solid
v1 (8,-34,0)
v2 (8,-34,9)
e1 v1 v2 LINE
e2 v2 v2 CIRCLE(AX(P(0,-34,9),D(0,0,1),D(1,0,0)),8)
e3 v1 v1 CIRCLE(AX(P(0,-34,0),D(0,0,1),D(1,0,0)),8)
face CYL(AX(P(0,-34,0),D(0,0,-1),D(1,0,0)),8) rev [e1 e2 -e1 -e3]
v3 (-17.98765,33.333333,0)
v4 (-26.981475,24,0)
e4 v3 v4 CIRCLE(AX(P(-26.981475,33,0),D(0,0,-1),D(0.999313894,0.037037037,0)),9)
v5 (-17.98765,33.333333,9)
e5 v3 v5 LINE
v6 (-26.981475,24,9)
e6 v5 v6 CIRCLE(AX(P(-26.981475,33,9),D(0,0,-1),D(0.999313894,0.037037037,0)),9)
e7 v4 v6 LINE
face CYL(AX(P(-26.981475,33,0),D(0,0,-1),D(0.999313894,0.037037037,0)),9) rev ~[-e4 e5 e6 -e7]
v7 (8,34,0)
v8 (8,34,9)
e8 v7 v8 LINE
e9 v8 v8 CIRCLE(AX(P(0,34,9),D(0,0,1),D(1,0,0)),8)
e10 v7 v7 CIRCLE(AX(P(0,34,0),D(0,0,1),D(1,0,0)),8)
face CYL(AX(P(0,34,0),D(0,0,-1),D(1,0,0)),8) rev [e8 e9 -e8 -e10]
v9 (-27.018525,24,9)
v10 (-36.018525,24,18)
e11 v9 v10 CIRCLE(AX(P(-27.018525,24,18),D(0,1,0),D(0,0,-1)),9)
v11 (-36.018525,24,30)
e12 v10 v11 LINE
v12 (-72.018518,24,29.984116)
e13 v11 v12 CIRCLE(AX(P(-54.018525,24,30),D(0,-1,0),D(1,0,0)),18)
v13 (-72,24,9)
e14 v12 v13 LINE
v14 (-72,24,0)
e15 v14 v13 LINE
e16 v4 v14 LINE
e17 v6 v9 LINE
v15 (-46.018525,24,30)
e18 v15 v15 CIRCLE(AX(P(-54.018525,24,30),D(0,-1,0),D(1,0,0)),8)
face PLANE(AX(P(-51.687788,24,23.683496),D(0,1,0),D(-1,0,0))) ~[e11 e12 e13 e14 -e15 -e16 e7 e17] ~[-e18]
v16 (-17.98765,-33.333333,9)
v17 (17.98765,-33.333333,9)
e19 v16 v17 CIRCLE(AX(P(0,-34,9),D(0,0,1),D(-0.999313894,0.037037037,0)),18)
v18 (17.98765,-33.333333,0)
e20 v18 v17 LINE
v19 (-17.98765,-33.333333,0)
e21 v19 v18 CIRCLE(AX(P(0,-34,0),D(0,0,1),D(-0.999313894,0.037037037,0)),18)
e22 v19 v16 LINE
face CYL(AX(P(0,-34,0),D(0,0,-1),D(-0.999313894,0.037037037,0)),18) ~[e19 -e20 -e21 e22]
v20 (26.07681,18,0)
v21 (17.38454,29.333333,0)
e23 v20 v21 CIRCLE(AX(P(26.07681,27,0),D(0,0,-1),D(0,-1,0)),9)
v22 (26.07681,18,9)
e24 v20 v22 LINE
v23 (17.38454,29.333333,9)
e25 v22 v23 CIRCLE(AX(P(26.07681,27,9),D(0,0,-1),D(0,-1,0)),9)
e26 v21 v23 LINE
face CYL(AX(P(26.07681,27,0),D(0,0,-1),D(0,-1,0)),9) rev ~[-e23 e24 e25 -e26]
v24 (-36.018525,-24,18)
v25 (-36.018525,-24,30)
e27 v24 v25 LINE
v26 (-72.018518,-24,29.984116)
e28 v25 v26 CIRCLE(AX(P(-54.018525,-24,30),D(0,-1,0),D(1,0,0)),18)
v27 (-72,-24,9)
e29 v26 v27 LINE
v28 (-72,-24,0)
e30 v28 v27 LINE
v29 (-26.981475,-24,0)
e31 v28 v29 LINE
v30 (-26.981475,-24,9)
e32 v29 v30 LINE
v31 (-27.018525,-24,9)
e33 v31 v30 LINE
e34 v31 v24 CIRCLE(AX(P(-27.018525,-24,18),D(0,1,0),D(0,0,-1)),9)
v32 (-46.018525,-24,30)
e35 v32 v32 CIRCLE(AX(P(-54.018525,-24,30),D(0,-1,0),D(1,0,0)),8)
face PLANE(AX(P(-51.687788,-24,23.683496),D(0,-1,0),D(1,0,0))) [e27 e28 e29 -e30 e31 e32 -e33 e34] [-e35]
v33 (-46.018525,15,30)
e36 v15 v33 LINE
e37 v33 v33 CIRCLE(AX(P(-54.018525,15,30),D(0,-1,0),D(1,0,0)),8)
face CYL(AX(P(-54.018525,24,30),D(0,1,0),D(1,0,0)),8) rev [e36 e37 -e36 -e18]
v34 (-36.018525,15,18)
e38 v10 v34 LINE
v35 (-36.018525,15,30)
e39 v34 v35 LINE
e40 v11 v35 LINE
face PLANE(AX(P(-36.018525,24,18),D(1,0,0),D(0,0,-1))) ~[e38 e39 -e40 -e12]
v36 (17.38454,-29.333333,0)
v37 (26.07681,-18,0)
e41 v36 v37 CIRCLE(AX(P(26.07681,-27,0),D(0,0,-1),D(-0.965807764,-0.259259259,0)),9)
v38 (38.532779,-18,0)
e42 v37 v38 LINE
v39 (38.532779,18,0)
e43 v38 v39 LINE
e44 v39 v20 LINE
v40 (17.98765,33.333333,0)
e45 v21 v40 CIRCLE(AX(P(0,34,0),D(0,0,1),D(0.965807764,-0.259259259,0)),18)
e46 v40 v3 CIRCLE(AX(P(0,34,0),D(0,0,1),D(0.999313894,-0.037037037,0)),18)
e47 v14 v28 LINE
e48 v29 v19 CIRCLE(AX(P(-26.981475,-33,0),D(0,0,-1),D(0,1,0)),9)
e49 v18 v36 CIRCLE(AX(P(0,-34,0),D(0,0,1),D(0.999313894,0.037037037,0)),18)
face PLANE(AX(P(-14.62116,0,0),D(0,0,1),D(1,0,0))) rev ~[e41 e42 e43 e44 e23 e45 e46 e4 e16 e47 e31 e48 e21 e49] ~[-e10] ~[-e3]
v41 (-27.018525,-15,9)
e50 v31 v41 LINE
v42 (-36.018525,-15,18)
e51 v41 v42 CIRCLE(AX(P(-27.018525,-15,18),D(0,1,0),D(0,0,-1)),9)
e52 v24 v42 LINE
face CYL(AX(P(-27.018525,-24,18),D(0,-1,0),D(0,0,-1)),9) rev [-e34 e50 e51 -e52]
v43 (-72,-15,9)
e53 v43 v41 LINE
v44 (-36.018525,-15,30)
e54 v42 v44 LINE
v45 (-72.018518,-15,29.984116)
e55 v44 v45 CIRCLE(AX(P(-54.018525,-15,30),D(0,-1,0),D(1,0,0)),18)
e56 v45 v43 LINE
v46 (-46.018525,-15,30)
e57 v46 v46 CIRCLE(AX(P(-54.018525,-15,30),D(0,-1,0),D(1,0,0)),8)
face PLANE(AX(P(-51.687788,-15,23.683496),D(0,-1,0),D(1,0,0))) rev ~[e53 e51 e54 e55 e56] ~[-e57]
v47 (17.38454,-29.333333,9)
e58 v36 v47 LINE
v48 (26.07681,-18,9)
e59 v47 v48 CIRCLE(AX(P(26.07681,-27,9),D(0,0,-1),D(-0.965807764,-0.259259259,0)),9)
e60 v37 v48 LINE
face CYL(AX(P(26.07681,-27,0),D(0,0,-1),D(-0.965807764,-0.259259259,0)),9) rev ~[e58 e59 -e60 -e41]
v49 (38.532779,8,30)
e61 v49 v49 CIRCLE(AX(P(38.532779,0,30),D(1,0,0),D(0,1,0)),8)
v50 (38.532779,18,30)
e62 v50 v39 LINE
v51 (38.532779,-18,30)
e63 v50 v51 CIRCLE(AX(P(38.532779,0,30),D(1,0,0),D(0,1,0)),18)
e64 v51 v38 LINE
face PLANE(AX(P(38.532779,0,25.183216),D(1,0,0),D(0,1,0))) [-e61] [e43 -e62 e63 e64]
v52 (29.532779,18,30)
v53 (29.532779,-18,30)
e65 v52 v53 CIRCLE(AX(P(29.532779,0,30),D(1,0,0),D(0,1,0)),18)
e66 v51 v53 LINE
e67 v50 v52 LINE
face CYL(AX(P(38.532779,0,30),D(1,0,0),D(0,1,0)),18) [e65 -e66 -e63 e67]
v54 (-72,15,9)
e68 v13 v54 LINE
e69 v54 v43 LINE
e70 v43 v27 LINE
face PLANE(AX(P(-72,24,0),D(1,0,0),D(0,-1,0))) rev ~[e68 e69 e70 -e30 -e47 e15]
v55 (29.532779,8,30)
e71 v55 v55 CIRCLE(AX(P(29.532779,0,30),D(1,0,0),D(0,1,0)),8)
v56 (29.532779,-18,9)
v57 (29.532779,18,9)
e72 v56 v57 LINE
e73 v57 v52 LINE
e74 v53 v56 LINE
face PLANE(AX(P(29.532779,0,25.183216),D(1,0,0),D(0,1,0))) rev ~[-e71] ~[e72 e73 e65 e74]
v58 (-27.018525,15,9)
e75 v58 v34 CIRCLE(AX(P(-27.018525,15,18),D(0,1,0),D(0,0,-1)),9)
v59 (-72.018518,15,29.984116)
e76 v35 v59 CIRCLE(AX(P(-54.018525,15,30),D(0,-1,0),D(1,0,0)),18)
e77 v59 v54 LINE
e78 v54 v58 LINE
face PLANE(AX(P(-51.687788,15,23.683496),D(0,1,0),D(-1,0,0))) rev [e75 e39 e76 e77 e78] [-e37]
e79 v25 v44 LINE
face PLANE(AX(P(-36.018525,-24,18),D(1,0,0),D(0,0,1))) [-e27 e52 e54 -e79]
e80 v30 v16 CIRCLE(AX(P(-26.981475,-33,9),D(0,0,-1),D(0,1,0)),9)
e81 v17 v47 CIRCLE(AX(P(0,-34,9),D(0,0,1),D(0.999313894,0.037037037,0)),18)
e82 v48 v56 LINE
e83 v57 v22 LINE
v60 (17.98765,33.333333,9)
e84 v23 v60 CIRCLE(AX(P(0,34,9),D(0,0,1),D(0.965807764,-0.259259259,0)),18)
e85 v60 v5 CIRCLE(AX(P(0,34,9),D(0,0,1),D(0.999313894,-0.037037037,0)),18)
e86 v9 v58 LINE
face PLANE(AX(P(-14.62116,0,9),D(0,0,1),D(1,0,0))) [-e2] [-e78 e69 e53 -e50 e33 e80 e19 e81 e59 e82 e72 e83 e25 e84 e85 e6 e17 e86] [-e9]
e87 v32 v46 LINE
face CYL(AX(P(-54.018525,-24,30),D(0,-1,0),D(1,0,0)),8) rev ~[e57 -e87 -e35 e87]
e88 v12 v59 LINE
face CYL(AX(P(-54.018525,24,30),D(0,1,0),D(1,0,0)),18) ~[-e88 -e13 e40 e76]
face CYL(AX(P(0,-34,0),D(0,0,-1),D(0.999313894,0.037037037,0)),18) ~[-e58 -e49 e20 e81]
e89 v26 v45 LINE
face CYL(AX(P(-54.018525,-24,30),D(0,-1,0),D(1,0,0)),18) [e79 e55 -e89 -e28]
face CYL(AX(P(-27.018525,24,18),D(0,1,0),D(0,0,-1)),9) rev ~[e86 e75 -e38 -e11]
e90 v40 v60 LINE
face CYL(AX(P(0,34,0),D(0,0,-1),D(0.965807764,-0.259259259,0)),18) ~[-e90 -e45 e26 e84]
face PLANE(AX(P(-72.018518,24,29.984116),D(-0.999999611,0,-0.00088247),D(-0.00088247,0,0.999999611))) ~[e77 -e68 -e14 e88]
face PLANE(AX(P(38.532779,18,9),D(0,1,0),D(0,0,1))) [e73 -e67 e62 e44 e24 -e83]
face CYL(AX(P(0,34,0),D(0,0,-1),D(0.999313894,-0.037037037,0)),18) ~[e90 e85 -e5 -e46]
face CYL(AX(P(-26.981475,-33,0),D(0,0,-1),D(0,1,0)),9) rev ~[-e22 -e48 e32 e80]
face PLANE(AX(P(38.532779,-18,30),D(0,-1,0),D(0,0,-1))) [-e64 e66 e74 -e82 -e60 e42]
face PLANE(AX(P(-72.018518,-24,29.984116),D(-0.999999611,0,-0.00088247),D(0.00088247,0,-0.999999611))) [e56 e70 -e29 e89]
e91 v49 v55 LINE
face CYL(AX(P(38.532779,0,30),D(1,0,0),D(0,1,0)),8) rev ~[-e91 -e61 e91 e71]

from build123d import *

# Parameters (mm, degrees)
F0_R     = 8
F1_DEPTH = 9
F3_DEPTH = 9
F4_R     = 8
F5_DEPTH = 9
F7_DEPTH = 9
F8_R     = 8
F9_DEPTH = 9


# Not quite as in the source:
# - a pattern or mirror of a feature is missing from the dataset's text; its kind, count and spacing are read off the source's solid


with BuildPart() as f1:
    # F0 (on Top) → F1 (new body)
    with BuildSketch(Plane.XY):
        with BuildLine():
            ThreePointArc((17.3845397472, 29.3333333333), (17.7988188757, 31.316337087), (17.9876500843, 33.3333333333))
            ThreePointArc((17.9876500843, 33.3333333333), (0, 52), (-17.9876500843, 33.3333333333))
            ThreePointArc((-17.9876500843, 33.3333333333), (-20.5007344281, 26.7550020016), (-26.9814751265, 24))
            Line((-26.9814751265, 24), (-72, 24))
            Line((-72, 24), (-72, -24))
            Line((-72, -24), (-26.9814751265, -24))
            ThreePointArc((-26.9814751265, -24), (-20.5007344281, -26.7550020016), (-17.9876500843, -33.3333333333))
            ThreePointArc((-17.9876500843, -33.3333333333), (0, -52), (17.9876500843, -33.3333333333))
            ThreePointArc((17.9876500843, -33.3333333333), (17.7988188757, -31.316337087), (17.3845397472, -29.3333333333))
            ThreePointArc((17.3845397472, -29.3333333333), (18.9353811923, -21.5227744249), (26.0768096208, -18))
            Line((26.0768096208, -18), (38.5327786207, -18))
            Line((38.5327786207, -18), (38.5327786207, 18))
            Line((38.5327786207, 18), (26.0768096208, 18))
            ThreePointArc((26.0768096208, 18), (18.9353811923, 21.5227744249), (17.3845397472, 29.3333333333))
        make_face()
        with Locations((0, -34)):
            Circle(F0_R, mode=Mode.SUBTRACT)
        with Locations((0, 34)):
            Circle(F0_R, mode=Mode.SUBTRACT)
    extrude(amount=F1_DEPTH)

    # F2 (on face) → F3 (join)
    with BuildSketch(Plane.XZ.offset(24)):
        with BuildLine():
            Line((-36.0185248735, 18), (-36.0185248735, 30))
            ThreePointArc((-36.0185248735, 30), (-54.0264671065, 47.9999982478), (-72.0185178648, 29.9841155356))
            Line((-72.0185178648, 29.9841155356), (-72, 9))
            Line((-72, 9), (-27.0185248735, 9))
            ThreePointArc((-27.0185248735, 9), (-33.3824859042, 11.6360389693), (-36.0185248735, 18))
        make_face()
    f3 = extrude(amount=-F3_DEPTH)

    # F3_copies: F3 across plane
    add(f3.mirror(Plane.ZX))

    # F4 (on face) → F5 (cut, through all)
    with BuildSketch(Plane.XZ.offset(24)):
        with Locations((-54.0185248735, 30)):
            Circle(F4_R)
    f5 = extrude(amount=-F5_DEPTH, mode=Mode.SUBTRACT)

    # F5_copies: F5 across plane
    add(f5.mirror(Plane.ZX), mode=Mode.SUBTRACT)

    # F6 (on face) → F7 (join)
    with BuildSketch(Plane.YZ.offset(38.5327786207)):
        with BuildLine():
            Line((18, 9), (18, 30))
            ThreePointArc((18, 30), (0, 48), (-18, 30))
            Line((-18, 30), (-18, 9))
            Line((-18, 9), (18, 9))
        make_face()
    extrude(amount=-F7_DEPTH)

    # F8 (on face) → F9 (cut, through all)
    with BuildSketch(Plane.YZ.offset(38.5327786207)):
        with Locations((0, 30)):
            Circle(F8_R)
    extrude(amount=-F9_DEPTH, mode=Mode.SUBTRACT)


solid = f1.part
